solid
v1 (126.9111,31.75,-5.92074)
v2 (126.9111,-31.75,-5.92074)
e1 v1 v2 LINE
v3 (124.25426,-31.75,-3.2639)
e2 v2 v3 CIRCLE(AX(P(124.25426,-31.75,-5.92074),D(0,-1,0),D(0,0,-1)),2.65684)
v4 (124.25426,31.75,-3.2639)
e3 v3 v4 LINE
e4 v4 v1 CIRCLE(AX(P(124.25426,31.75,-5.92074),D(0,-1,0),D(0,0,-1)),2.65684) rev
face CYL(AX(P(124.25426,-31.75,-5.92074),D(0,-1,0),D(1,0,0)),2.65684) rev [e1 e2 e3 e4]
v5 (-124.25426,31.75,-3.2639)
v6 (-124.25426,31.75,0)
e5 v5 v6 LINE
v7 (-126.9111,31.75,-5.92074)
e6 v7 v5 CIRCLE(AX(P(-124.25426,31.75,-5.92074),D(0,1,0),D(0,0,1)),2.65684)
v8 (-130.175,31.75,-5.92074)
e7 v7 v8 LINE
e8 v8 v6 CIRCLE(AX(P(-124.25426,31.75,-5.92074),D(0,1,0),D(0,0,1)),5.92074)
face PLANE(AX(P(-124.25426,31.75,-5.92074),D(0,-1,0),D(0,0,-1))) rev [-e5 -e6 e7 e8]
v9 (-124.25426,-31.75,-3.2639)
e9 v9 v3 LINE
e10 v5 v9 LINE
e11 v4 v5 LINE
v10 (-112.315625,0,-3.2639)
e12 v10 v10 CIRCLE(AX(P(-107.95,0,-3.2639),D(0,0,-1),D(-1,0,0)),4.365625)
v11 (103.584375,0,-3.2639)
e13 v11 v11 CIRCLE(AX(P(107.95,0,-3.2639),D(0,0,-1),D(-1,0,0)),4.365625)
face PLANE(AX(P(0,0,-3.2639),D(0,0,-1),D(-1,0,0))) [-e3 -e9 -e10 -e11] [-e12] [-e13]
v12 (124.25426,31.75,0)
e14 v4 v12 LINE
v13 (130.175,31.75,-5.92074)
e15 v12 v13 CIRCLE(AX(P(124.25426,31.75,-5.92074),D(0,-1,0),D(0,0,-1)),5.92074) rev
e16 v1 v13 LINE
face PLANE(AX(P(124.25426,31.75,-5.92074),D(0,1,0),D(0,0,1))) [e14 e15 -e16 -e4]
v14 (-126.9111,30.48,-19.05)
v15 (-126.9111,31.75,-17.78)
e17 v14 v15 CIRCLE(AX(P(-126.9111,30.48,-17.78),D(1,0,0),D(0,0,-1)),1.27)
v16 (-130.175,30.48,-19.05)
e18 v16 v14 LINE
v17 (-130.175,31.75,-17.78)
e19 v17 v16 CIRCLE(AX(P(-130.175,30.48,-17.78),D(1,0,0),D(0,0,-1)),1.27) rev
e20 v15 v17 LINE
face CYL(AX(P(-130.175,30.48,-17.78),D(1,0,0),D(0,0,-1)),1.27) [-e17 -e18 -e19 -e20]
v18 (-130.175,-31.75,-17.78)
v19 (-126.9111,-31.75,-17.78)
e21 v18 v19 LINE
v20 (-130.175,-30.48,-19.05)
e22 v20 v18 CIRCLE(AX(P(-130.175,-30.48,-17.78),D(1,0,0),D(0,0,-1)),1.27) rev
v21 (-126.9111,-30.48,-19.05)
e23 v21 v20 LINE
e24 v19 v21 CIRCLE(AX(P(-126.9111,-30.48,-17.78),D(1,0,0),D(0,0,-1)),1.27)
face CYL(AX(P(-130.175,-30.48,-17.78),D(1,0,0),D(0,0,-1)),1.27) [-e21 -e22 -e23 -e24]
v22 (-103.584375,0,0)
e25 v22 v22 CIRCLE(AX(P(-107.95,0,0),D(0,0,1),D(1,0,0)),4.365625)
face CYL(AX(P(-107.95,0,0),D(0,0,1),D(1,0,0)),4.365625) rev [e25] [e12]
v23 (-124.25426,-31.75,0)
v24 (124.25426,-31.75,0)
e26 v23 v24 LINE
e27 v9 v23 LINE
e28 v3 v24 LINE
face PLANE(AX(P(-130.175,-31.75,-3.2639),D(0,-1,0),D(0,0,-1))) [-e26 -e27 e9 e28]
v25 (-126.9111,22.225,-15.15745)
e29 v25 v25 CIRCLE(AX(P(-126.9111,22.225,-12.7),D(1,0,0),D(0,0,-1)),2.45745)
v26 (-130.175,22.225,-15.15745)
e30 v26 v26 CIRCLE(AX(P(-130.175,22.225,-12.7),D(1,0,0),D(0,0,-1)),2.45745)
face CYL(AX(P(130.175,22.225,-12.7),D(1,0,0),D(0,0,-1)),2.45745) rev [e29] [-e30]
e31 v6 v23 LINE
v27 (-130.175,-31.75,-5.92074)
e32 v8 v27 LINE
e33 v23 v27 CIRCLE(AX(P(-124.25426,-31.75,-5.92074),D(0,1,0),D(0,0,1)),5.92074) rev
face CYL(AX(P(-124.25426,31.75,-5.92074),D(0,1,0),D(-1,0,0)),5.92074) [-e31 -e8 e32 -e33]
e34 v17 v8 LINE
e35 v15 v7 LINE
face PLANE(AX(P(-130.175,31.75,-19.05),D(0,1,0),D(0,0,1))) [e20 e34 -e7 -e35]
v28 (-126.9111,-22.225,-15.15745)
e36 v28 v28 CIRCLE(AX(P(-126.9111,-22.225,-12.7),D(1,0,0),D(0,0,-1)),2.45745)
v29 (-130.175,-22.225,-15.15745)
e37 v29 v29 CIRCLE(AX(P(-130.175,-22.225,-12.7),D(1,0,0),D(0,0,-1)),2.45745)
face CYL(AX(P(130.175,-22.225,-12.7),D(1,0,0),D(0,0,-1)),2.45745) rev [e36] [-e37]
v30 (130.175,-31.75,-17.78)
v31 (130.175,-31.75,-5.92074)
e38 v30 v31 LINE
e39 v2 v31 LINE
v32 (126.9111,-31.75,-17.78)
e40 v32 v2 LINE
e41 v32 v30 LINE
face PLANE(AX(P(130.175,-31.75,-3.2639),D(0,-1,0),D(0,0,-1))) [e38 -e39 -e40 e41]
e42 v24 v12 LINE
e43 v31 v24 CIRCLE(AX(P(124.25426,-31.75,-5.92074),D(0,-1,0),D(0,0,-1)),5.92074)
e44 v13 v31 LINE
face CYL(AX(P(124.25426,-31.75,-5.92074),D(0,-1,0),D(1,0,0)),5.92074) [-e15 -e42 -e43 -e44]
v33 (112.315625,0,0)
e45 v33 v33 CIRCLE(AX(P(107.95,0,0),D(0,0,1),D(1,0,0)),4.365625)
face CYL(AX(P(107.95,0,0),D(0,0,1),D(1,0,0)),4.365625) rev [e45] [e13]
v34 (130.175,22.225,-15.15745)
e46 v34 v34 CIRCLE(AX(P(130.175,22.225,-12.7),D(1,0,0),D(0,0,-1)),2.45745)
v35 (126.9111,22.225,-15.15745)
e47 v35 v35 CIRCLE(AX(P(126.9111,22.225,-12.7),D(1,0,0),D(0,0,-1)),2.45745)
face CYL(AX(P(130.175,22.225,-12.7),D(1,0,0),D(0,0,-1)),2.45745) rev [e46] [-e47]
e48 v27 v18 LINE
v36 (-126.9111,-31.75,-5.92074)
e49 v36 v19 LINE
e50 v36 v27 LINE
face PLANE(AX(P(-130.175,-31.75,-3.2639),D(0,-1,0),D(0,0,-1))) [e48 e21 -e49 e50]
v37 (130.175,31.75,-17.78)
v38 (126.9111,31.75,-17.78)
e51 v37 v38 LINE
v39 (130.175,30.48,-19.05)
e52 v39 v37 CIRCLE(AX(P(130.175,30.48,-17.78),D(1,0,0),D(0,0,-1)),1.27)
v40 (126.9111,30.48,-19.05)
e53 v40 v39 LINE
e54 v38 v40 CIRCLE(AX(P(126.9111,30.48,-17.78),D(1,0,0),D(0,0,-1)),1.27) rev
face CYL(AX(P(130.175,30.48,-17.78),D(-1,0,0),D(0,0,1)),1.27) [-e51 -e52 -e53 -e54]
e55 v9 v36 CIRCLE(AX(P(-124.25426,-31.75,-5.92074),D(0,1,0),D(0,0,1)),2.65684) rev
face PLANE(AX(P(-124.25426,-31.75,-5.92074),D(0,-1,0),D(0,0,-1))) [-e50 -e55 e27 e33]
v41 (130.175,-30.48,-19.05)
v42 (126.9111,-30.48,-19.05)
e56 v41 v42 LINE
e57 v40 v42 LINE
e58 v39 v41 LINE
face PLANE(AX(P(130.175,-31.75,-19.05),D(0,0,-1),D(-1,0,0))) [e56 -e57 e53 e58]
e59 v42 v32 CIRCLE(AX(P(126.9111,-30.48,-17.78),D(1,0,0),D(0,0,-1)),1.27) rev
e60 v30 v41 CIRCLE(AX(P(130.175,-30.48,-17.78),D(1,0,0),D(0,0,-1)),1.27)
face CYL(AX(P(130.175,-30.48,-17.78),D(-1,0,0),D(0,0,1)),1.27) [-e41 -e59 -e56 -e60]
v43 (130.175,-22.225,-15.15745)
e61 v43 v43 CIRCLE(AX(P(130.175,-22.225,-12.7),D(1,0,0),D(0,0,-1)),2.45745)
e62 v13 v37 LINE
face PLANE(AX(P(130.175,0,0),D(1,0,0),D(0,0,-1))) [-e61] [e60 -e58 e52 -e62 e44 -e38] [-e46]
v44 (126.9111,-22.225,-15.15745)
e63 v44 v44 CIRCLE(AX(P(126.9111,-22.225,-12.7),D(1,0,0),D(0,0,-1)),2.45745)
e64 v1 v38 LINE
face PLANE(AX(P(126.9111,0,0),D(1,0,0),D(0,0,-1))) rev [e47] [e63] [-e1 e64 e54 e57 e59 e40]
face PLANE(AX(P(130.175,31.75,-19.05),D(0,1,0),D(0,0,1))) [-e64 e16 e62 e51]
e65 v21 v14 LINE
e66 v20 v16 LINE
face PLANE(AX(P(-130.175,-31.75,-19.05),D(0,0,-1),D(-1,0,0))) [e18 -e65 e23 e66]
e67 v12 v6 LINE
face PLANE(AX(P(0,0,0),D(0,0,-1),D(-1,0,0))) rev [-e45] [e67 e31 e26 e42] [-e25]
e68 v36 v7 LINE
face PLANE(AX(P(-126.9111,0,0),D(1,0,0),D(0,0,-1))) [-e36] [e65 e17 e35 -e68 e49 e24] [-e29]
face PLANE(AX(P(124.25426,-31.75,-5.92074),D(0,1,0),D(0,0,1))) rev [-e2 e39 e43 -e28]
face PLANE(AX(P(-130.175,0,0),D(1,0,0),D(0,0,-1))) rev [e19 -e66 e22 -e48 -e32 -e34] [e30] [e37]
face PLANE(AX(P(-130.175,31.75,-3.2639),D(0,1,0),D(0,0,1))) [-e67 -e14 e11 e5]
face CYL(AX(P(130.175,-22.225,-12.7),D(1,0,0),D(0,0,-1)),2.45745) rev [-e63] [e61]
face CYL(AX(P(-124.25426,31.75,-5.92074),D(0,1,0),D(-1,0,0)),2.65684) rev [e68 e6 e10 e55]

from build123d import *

# Parameters (mm, degrees)
SKETCH1_W                        = 260.35
SKETCH1_H                        = 63.5
BASE_FLANGE1_DEPTH               = 3.2639
EDGE_FLANGE1_STRIP_W             = 18.36928
EDGE_FLANGE1_STRIP_H             = 3.2639
EDGE_FLANGE1_STRIP_CUT_DEPTH     = 63.5
EDGE_FLANGE1_STRIP_2_W           = 18.36928
EDGE_FLANGE1_STRIP_2_H           = 3.2639
EDGE_FLANGE1_STRIP_CUT_2_DEPTH   = 63.5
EDGE_FLANGE1_DEPTH               = 63.5
EDGE_FLANGE1_BEND_DEPTH          = 63.5
F_10_0_1935_DIAMETER_HOLE1_D     = 4.9149
FILLET1_R                        = 1.27
F_11_32_0_34375_DIAMETER_HOLE1_D = 8.73125


# Sheet-metal steps are written as plain solids
with BuildPart() as part:
    # Sketch1 → Base-Flange1 (new body)
    with BuildSketch(Plane.XY):
        Rectangle(SKETCH1_W, SKETCH1_H)
    extrude(amount=-BASE_FLANGE1_DEPTH)

    # Edge-Flange1 strip (across the edge) → Edge-Flange1 strip cut (cut)
    with BuildSketch(Plane(origin=(130.175, 31.75, -3.2639), x_dir=(-1, 0, 0), z_dir=(0, -1, 0))):
        with Locations((-3.2639, -1.63195)):
            Rectangle(EDGE_FLANGE1_STRIP_W, EDGE_FLANGE1_STRIP_H)
    extrude(amount=EDGE_FLANGE1_STRIP_CUT_DEPTH, mode=Mode.SUBTRACT)

    # Edge-Flange1 strip 2 (across the edge) → Edge-Flange1 strip cut 2 (cut)
    with BuildSketch(Plane(origin=(-130.175, -31.75, -3.2639), x_dir=(1, 0, 0), z_dir=(0, 1, 0))):
        with Locations((-3.2639, -1.63195)):
            Rectangle(EDGE_FLANGE1_STRIP_2_W, EDGE_FLANGE1_STRIP_2_H)
    extrude(amount=EDGE_FLANGE1_STRIP_CUT_2_DEPTH, mode=Mode.SUBTRACT)

    # Edge-Flange1 section (across the edge) → Edge-Flange1 (add)
    with BuildSketch(Plane(origin=(130.175, 31.75, -3.2639), x_dir=(-1, 0, 0), z_dir=(0, -1, 0))):
        with BuildLine():
            Line((0, 2.65684), (0, 15.7861))
            Line((0, 15.7861), (3.2639, 15.7861))
            Line((3.2639, 15.7861), (3.2639, 2.65684))
            ThreePointArc((3.2639, 2.65684), (4.042070419, 0.778170419), (5.92074, 0))
            Line((5.92074, 0), (5.92074, -3.2639))
            ThreePointArc((5.92074, -3.2639), (1.734144596, -1.529755404), (0, 2.65684))
        make_face()
    extrude(amount=EDGE_FLANGE1_DEPTH)

    # Edge-Flange1 section 2 (across the edge) → Edge-Flange1 bend (add)
    with BuildSketch(Plane(origin=(-130.175, -31.75, -3.2639), x_dir=(1, 0, 0), z_dir=(0, 1, 0))):
        with BuildLine():
            Line((0, 2.65684), (0, 15.7861))
            Line((0, 15.7861), (3.2639, 15.7861))
            Line((3.2639, 15.7861), (3.2639, 2.65684))
            ThreePointArc((3.2639, 2.65684), (4.042070419, 0.778170419), (5.92074, 0))
            Line((5.92074, 0), (5.92074, -3.2639))
            ThreePointArc((5.92074, -3.2639), (1.734144596, -1.529755404), (0, 2.65684))
        make_face()
    extrude(amount=EDGE_FLANGE1_BEND_DEPTH)

    # #10 (0.1935) Diameter Hole1 (through all)
    with Locations(Plane(origin=(130.175, 0, 0), x_dir=(0, 0, -1), z_dir=(1, 0, 0))):
        with Locations((12.7, 22.225), (12.7, -22.225)):
            Hole(F_10_0_1935_DIAMETER_HOLE1_D / 2)

    # Fillet1
    fillet1_edges = [part.edges().sort_by_distance(p)[0] for p in [
        (128.54305, 31.75, -19.05),
        (128.54305, -31.75, -19.05),
        (-128.54305, -31.75, -19.05),
        (-128.54305, 31.75, -19.05),
    ]]
    fillet(fillet1_edges, radius=FILLET1_R)

    # 11/32 (0.34375) Diameter Hole1 (through all)
    with Locations(Plane.XY):
        with Locations((-107.95, 0), (107.95, 0)):
            Hole(F_11_32_0_34375_DIAMETER_HOLE1_D / 2)


solid = part.part
